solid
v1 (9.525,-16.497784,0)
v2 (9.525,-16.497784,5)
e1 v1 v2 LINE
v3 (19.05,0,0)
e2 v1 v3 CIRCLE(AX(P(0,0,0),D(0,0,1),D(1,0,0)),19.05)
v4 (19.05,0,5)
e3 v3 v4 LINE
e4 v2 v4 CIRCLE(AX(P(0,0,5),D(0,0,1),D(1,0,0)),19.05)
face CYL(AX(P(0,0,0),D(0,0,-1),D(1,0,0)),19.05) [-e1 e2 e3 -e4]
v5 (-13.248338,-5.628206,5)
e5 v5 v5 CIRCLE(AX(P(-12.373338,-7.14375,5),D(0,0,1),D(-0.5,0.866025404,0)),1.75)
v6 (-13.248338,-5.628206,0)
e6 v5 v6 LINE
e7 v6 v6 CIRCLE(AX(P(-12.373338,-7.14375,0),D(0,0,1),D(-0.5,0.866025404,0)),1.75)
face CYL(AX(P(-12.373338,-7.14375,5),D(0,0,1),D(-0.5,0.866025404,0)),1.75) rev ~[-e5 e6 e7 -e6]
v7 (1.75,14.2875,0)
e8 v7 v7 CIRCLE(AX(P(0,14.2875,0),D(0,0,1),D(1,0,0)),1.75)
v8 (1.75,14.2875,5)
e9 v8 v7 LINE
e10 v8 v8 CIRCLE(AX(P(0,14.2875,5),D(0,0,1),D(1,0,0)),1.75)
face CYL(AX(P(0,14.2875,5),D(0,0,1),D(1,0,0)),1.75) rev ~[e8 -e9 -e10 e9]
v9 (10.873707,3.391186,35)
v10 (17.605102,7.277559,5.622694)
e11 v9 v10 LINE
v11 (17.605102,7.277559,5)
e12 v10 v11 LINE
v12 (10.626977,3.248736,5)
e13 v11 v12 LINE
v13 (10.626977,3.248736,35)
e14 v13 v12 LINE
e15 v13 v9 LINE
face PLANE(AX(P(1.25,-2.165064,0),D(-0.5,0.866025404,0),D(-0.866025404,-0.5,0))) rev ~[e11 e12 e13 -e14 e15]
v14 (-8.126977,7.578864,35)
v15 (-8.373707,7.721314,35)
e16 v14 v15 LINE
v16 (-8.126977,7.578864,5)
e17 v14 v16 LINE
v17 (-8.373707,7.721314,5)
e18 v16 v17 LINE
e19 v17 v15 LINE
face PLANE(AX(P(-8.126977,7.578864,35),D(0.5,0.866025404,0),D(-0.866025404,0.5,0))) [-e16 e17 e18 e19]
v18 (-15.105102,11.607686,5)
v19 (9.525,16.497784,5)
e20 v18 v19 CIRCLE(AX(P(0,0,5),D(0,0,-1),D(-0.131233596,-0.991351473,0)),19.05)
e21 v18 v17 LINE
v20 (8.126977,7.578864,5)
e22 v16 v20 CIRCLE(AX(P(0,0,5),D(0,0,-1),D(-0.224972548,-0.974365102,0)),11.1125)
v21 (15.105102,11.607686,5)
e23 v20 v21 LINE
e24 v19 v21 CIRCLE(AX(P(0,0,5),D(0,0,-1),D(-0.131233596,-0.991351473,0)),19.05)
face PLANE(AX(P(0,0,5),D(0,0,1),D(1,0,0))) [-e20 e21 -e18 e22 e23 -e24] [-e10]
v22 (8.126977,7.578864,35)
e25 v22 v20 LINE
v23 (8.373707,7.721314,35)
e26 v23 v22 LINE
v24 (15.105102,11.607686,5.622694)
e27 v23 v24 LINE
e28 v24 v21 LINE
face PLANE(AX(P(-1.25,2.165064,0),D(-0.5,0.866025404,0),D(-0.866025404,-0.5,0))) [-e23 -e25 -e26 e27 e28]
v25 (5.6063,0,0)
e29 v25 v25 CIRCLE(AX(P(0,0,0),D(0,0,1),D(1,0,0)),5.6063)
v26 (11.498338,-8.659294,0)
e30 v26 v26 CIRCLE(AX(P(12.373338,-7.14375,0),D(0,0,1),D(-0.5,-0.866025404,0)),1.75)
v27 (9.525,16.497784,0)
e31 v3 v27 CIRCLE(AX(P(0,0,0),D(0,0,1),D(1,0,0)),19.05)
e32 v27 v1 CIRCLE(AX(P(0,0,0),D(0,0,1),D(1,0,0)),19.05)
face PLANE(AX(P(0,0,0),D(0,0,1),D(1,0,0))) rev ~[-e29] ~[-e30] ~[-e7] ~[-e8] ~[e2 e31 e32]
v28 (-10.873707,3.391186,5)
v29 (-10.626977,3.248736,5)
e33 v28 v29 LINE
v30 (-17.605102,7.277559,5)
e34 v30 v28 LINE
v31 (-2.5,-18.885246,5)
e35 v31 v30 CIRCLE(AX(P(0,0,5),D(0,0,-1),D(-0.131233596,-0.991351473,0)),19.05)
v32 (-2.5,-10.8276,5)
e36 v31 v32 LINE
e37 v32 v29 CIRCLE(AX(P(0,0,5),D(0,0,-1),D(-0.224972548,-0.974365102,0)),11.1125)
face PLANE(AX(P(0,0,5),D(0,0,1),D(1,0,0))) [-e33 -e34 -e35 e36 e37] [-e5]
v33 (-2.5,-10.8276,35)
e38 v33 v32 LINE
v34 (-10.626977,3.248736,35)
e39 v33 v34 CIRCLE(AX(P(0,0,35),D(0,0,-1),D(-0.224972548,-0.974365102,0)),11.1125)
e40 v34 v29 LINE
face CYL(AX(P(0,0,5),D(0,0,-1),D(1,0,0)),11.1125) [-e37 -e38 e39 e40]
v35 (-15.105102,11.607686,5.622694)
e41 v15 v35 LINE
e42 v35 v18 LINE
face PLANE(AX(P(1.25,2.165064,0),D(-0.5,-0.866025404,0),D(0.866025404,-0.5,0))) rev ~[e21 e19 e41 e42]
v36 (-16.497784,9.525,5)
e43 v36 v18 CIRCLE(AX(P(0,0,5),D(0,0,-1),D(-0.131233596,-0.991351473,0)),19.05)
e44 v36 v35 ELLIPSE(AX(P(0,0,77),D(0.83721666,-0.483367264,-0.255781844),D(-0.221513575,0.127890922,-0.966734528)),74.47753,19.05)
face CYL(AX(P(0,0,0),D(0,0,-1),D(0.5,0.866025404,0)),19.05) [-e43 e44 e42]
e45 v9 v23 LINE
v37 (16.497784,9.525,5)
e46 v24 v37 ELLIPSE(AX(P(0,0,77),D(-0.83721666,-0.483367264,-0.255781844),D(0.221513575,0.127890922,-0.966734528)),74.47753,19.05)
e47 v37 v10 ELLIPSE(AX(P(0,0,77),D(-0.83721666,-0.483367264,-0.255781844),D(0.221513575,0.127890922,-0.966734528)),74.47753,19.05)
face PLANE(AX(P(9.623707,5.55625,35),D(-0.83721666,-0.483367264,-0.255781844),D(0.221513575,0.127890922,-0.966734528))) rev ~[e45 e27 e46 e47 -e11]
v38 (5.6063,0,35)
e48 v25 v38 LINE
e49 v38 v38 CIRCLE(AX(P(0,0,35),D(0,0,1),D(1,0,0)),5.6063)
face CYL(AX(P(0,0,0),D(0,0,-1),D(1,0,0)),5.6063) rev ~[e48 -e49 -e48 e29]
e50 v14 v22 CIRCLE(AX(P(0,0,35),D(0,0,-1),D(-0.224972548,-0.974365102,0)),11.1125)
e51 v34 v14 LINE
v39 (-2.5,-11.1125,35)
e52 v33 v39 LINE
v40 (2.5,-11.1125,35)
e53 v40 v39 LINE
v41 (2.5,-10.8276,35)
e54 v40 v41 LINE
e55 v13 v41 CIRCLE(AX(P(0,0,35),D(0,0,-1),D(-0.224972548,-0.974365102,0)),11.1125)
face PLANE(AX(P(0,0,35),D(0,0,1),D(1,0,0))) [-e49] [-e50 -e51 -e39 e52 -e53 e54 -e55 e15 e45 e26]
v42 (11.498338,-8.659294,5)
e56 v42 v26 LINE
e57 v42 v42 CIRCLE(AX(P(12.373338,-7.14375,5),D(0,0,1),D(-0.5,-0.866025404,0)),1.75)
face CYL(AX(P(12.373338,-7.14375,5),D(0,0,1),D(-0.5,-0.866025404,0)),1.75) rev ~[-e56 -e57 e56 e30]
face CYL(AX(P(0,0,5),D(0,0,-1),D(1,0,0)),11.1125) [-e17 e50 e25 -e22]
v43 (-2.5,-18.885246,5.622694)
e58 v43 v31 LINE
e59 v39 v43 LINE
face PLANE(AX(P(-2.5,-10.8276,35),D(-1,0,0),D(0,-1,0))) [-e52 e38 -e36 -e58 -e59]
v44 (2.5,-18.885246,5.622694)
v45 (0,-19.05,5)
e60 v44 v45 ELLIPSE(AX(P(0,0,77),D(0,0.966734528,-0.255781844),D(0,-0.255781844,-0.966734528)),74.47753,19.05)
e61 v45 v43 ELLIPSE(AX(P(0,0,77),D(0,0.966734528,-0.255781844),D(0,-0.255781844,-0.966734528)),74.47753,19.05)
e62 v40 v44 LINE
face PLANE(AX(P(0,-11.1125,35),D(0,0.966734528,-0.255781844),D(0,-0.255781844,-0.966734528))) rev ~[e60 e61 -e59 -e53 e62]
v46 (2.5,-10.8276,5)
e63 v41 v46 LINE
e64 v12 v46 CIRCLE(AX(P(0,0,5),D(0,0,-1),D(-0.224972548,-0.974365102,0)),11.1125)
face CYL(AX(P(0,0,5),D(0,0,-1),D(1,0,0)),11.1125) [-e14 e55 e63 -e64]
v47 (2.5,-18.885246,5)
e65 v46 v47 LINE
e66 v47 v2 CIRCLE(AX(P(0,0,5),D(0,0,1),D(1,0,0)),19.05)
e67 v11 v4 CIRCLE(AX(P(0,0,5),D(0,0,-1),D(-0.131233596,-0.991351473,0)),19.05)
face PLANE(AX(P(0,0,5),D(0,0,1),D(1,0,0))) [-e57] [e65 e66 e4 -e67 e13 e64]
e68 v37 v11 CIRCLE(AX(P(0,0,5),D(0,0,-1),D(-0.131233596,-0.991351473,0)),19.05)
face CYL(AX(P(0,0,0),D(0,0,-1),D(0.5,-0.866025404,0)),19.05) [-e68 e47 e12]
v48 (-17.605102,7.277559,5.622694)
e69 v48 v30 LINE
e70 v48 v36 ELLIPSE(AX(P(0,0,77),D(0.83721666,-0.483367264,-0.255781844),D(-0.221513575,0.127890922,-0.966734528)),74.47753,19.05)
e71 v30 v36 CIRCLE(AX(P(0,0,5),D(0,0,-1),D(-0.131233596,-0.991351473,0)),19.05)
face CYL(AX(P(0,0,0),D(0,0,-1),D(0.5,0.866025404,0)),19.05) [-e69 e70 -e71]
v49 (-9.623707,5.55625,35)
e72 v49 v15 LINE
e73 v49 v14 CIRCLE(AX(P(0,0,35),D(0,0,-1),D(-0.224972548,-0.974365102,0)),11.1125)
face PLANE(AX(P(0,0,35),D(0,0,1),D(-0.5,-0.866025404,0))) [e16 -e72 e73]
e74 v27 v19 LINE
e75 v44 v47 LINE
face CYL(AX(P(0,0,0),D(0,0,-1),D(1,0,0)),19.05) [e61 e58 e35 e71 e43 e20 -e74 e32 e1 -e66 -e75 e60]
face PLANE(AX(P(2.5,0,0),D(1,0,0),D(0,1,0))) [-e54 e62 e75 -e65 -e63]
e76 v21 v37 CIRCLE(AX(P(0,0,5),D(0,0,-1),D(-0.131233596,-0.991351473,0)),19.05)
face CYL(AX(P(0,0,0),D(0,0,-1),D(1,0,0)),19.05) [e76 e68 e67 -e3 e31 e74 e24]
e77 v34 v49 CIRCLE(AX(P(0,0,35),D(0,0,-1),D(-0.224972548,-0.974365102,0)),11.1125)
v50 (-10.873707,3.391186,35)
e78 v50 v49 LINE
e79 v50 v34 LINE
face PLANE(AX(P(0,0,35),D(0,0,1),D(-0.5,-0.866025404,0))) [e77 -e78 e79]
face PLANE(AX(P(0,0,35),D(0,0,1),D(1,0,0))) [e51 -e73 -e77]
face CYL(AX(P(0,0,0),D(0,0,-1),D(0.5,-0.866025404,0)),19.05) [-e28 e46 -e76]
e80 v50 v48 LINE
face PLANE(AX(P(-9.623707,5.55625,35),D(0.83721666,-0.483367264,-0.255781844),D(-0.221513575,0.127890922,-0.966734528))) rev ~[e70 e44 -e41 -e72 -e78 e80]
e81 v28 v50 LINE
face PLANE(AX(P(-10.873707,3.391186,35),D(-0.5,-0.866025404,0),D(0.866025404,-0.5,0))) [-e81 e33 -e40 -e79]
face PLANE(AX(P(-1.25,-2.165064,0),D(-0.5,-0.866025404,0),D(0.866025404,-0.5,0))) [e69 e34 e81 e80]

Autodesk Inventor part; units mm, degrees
ref_plane "YZ Plane" through (0, 0, 0) normal (1, 0, 0) x (0, 1, 0)
ref_plane "XZ Plane" through (0, 0, 0) normal (0, 1, 0) x (-1, 0, 0)
ref_plane "XY Plane" through (0, 0, 0) normal (0, 0, 1) x (1, 0, 0)
sketch "Sketch1" plane through (0, 0, 0) normal (0, 0, 1) x (1, 0, 0)
  circle A0 centre (0, 0) radius 19.05
  circle A1 centre (0, 0) radius 5.6063
  dimension "d0" = 11.2125
  dimension "d2" = 38.1
extrude "Extrusion1" add sketch "Sketch1" along normal blind 5
sketch "Sketch2" plane through (0, 0, 5) normal (0, 0, 1) x (1, 0, 0)
  circle A0 centre (0, 0) radius 5.6063 projected
  circle A1 centre (0, 0) radius 19.05 projected
  circle A2 centre (0, 0) radius 14.2875
  circle A3 centre (0, 0) radius 11.1125
  dimension "d5" = 28.575
  dimension "d26" = 22.225
extrude "Extrusion2" add sketch "Sketch2" along normal blind 30 contours A3
sketch "Sketch3" plane through (0, 0, 5) normal (0, 0, 1) x (1, 0, 0)
  circle A0 centre (0, 0) radius 11.1125 projected
  circle A1 centre (0, 14.2875) radius 1.75
  dimension "d11" = 14.2875
  dimension "d12" = 3.5
extrude "Extrusion3" cut sketch "Sketch3" against normal through all contours A1
sketch "Sketch4" plane through (0, 0, 0) normal (1, 0, 0) x (0, 1, 0)
  line L0 (11.1125, 35) -> (11.1125, 5) projected
  line L1 (11.1125, 5) -> (12.5375, 5) projected
  line L2 (12.5375, 5) -> (12.5375, 0) projected
  line L3 (12.5375, 0) -> (5.6063, 0) projected
  line L4 (5.6063, 0) -> (5.6063, 35) projected
  line L5 (5.6063, 35) -> (11.1125, 35) projected
  line L6 (-19.05, 0) -> (-19.05, 5) projected
  line L7 (-19.05, 5) -> (-11.1125, 5) projected
  line L8 (-11.1125, 5) -> (-11.1125, 35) projected
  line L9 (-11.1125, 35) -> (-5.6063, 35) projected
  line L10 (-5.6063, 35) -> (-5.6063, 0) projected
  line L11 (-5.6063, 0) -> (-19.05, 0) projected
  line L12 (19.05, 5) -> (19.05, 0) projected
  line L13 (19.05, 0) -> (16.0375, 0) projected
  line L14 (16.0375, 0) -> (16.0375, 5) projected
  line L15 (16.0375, 5) -> (19.05, 5) projected
  line L16 (-19.05, 5) -> (-11.1125, 5)
  line L17 (-11.1125, 35) -> (-19.05, 5)
  line L18 (-11.1125, 35) -> (-11.1125, 5)
  point P0 (0, 0)
extrude "Extrusion4" add sketch "Sketch4" along normal mid plane 5 contours L17 L8 L7
sketch "Sketch5" plane through (0, 0, 35) normal (0, 0, 1) x (1, 0, 0)
  circle A0 centre (0, 0) radius 11.1125 projected
  line L0 (2.5, -19.05) -> (0, -19.05) projected
  line L1 (2.5, -11.1125) -> (2.5, -19.05) projected
  line L2 (0, -11.1125) -> (2.5, -11.1125) projected
  line L3 (-2.5, -11.1125) -> (0, -11.1125) projected
  line L4 (-2.5, -19.05) -> (-2.5, -11.1125) projected
  line L5 (0, -19.05) -> (-2.5, -19.05) projected
  line L6 (-2.5, -11.1125) -> (2.5, -11.1125)
  line L7 (2.5, -11.1125) -> (2.5, -10.8276)
  line L8 (2.5, -10.8276) -> (-2.5, -10.8276)
  line L9 (-2.5, -10.8276) -> (-2.5, -11.1125)
extrude "Extrusion5" add sketch "Sketch5" against normal up to surface (30 mm away) contours L8 A0 | A0 L3 L9 | L7 L2 A0 picked at (-0.5582, -10.8803)
sketch "Sketch6" plane through (0, 0, 0) normal (0, 0, -1) x (-1, 0, 0)
  circle A0 centre (0, 0) radius 19.05 projected
  circle A1 centre (0, 0) radius 25.4
  dimension "d19" = 6.35
extrude "Extrusion6" cut sketch "Sketch6" against normal through all
pattern_circular "Circular Pattern1" count 3 over 360 about axis through (0, 0, 5) along (0, 0, 1) of "Extrusion6", "Extrusion5", "Extrusion4", "Extrusion3"
properties part number "GUIDE"
